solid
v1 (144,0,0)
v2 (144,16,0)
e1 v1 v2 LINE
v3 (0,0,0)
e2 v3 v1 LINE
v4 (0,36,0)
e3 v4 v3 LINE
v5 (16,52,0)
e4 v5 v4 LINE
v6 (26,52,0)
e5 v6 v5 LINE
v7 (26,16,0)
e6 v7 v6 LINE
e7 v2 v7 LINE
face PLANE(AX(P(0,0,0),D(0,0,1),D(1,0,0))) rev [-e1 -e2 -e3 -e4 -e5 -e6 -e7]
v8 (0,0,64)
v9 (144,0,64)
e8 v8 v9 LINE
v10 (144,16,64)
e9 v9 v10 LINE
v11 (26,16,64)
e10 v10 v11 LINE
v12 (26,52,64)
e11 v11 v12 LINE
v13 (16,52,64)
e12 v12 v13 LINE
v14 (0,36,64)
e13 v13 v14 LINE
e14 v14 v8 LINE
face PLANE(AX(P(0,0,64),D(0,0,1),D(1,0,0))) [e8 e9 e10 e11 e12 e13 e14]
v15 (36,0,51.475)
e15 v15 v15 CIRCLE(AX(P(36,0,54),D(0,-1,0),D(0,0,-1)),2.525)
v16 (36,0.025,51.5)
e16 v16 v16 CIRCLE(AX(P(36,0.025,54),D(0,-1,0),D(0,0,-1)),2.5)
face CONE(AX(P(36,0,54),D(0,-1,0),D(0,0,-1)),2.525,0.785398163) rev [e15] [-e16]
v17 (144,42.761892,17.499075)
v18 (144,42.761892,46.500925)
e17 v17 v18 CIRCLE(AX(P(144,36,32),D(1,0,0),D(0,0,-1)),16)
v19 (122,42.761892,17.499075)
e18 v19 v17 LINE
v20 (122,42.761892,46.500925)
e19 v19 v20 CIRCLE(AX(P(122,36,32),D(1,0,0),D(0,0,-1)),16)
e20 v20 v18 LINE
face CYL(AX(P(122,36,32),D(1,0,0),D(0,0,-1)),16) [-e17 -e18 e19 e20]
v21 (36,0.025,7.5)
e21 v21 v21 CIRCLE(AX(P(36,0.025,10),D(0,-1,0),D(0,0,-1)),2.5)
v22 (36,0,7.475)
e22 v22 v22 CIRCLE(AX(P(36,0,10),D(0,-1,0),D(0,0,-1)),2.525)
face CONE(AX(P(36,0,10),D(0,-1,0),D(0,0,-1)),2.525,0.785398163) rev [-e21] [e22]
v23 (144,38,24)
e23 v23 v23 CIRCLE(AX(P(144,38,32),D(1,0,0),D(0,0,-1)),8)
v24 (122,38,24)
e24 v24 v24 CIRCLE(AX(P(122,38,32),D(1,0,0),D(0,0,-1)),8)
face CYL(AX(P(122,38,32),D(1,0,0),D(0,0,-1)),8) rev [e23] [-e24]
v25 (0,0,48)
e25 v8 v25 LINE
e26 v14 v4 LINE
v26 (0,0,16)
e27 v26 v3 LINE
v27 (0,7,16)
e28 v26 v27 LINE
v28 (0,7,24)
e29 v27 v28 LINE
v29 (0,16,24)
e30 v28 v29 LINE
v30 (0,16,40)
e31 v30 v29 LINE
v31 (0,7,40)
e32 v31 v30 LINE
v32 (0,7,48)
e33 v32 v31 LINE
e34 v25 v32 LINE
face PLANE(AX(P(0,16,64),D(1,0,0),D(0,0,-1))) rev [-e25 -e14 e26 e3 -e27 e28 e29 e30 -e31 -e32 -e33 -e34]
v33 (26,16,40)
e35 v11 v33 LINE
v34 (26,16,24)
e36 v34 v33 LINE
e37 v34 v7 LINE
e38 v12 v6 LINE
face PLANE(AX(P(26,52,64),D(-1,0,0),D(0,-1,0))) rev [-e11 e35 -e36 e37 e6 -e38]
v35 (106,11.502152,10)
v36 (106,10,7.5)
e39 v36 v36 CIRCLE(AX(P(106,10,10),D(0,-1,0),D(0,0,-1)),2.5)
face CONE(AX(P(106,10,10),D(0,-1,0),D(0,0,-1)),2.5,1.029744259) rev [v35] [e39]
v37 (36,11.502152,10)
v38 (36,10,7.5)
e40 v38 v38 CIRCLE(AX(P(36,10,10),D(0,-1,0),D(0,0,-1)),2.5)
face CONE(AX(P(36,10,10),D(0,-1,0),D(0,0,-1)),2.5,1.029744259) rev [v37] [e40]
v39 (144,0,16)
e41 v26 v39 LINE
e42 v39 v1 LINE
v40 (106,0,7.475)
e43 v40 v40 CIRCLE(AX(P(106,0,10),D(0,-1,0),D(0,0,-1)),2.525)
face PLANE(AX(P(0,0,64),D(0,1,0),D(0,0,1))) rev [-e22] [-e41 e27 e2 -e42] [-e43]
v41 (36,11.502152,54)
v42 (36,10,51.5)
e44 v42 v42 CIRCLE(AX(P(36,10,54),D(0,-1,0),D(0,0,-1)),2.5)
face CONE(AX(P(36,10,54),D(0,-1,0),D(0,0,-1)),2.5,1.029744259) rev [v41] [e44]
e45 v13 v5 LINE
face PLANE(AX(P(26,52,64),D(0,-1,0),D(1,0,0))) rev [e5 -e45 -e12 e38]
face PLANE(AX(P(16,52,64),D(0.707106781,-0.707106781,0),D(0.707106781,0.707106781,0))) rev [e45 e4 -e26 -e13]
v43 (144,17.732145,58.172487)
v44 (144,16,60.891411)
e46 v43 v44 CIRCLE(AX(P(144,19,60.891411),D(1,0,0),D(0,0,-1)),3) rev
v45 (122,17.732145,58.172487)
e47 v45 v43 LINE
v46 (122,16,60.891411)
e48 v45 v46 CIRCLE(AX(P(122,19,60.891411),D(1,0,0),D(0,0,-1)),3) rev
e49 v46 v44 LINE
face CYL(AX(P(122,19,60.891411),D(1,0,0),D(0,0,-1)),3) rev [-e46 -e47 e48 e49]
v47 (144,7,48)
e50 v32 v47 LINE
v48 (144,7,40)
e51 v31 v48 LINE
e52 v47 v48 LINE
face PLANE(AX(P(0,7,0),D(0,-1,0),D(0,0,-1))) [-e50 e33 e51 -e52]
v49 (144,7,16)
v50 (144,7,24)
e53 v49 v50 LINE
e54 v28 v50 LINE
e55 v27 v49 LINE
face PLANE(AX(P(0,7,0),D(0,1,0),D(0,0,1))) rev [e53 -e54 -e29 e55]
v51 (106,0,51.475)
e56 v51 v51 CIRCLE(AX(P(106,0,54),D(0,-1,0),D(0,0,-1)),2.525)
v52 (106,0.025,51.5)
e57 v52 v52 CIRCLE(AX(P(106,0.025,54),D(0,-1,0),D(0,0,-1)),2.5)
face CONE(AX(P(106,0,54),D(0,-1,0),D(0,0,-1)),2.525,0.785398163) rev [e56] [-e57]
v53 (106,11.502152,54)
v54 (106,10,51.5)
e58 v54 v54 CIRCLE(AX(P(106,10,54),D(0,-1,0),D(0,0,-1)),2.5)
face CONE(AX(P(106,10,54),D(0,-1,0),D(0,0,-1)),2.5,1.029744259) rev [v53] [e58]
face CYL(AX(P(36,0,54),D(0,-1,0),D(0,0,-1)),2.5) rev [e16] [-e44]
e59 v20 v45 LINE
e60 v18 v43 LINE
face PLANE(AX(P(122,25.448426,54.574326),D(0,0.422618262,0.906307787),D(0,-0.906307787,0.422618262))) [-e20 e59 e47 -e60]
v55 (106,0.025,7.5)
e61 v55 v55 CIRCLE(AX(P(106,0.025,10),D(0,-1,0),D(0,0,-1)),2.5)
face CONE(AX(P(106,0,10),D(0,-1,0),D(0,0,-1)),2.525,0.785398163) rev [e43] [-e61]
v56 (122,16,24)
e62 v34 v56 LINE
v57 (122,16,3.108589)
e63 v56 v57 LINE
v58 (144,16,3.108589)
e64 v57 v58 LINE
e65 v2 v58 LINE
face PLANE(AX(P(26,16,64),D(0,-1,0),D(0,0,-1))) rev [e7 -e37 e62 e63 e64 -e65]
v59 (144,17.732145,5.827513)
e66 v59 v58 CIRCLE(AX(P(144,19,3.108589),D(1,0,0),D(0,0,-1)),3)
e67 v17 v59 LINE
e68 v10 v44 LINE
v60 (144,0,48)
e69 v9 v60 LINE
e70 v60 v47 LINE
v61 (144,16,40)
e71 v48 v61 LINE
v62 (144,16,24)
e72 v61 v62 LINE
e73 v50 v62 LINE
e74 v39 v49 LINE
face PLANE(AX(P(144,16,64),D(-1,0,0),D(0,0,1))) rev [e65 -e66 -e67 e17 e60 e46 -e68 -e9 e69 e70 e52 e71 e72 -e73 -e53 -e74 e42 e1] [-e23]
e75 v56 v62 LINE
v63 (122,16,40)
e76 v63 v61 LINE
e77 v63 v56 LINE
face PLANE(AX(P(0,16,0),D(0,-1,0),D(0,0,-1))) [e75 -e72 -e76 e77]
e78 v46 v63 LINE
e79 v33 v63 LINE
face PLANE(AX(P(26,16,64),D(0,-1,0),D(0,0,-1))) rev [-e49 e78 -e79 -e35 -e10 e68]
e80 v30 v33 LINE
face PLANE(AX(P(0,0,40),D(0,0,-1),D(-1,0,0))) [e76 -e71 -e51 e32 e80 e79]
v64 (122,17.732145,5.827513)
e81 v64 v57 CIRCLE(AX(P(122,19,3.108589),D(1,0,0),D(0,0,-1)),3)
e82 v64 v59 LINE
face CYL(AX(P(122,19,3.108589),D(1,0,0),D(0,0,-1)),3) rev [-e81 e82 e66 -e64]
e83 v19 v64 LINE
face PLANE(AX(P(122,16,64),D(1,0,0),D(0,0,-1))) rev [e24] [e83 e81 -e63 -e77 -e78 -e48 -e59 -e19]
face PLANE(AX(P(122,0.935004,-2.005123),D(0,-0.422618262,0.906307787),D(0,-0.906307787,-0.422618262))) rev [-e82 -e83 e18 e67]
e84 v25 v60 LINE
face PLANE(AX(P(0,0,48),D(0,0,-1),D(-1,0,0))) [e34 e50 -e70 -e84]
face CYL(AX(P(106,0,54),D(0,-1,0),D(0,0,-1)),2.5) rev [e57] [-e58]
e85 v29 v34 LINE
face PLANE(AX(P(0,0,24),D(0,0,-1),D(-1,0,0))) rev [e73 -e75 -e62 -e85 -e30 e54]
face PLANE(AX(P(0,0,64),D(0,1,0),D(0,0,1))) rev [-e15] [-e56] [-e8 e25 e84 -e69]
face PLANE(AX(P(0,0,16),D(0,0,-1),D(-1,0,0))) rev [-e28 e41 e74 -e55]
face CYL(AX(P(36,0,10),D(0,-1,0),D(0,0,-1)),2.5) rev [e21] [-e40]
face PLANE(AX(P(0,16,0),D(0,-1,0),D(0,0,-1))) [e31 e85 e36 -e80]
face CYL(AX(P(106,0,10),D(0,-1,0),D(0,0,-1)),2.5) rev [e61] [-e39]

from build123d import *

# Parameters (mm, degrees)
BOSS_EXTRUDE1_DEPTH                   = 64
SKETCH4_R                             = 8
CUT_EXTRUDE1_DEPTH                    = 22
CUT_EXTRUDE2_DEPTH                    = 166.939748102
TAP_DRILL_FOR_M6X1_0_TAP2_D           = 5
TAP_DRILL_FOR_M6X1_0_TAP2_DEPTH       = 10
TAP_DRILL_FOR_M6X1_0_TAP2_CSINK_D     = 5.05
TAP_DRILL_FOR_M6X1_0_TAP2_CSINK_ANGLE = 90
TAP_DRILL_FOR_M6X1_0_TAP2_TIP         = 1.502151548


with BuildPart() as part:
    # Sketch1 → Boss-Extrude1 (new body)
    with BuildSketch(Plane.XY):
        Polygon((0, 0), (144, 0), (144, 16), (144, 52), (122, 52), (122, 16), (26, 16), (26, 52), (16, 52), (0, 36), (0, 16), align=None)
    extrude(amount=BOSS_EXTRUDE1_DEPTH)

    # Sketch4 → Cut-Extrude1 (cut)
    with BuildSketch(Plane(origin=(144, 0, 0), x_dir=(0, 0, -1), z_dir=(1, 0, 0))):
        with BuildLine():
            Line((0, 52), (-32.000000005, 52))
            ThreePointArc((-32.000000005, 52), (-23.403206269, 49.494263134), (-17.499075407, 42.761892188))
            Line((-17.499075407, 42.761892188), (-5.827512712, 17.732145215))
            ThreePointArc((-5.827512712, 17.732145215), (-4.720488176, 16.469825663), (-3.108589351, 16))
            Line((-3.108589351, 16), (0, 16))
            Line((0, 16), (0, 52))
        make_face()
        with BuildLine():
            Line((-58.172487288, 17.732145215), (-46.500924593, 42.761892188))
            ThreePointArc((-46.500924593, 42.761892188), (-40.596793736, 49.494263132), (-32.000000005, 52))
            Line((-32.000000005, 52), (-64, 52))
            Line((-64, 52), (-64, 16))
            Line((-64, 16), (-60.891410649, 16))
            ThreePointArc((-60.891410649, 16), (-59.279511824, 16.469825663), (-58.172487288, 17.732145215))
        make_face()
        with Locations((-32, 38)):
            Circle(SKETCH4_R)
    extrude(amount=-CUT_EXTRUDE1_DEPTH, mode=Mode.SUBTRACT)

    # Sketch4<3> → Cut-Extrude2 (cut, through all)
    with BuildSketch(Plane(origin=(144, 0, 0), x_dir=(0, 0, -1), z_dir=(1, 0, 0))):
        Polygon((-24, 16), (-40, 16), (-40, 7), (-48, 7), (-48, 0), (-16, 0), (-16, 7), (-24, 7), align=None)
    extrude(amount=-CUT_EXTRUDE2_DEPTH, mode=Mode.SUBTRACT)

    # Tap Drill for M6x1.0 Tap2
    with Locations(Plane(origin=(0, 0, 0), x_dir=(-1, 0, 0), z_dir=(0, -1, 0))):
        with Locations((-36, -54), (-106, -54), (-106, -10), (-36, -10)):
            CounterSinkHole(TAP_DRILL_FOR_M6X1_0_TAP2_D / 2, TAP_DRILL_FOR_M6X1_0_TAP2_CSINK_D / 2, depth=TAP_DRILL_FOR_M6X1_0_TAP2_DEPTH, counter_sink_angle=TAP_DRILL_FOR_M6X1_0_TAP2_CSINK_ANGLE)
            with Locations((0, 0, -(TAP_DRILL_FOR_M6X1_0_TAP2_DEPTH + TAP_DRILL_FOR_M6X1_0_TAP2_TIP / 2))):  # 118° drill point
                Cone(0, TAP_DRILL_FOR_M6X1_0_TAP2_D / 2, TAP_DRILL_FOR_M6X1_0_TAP2_TIP, mode=Mode.SUBTRACT)


solid = part.part
